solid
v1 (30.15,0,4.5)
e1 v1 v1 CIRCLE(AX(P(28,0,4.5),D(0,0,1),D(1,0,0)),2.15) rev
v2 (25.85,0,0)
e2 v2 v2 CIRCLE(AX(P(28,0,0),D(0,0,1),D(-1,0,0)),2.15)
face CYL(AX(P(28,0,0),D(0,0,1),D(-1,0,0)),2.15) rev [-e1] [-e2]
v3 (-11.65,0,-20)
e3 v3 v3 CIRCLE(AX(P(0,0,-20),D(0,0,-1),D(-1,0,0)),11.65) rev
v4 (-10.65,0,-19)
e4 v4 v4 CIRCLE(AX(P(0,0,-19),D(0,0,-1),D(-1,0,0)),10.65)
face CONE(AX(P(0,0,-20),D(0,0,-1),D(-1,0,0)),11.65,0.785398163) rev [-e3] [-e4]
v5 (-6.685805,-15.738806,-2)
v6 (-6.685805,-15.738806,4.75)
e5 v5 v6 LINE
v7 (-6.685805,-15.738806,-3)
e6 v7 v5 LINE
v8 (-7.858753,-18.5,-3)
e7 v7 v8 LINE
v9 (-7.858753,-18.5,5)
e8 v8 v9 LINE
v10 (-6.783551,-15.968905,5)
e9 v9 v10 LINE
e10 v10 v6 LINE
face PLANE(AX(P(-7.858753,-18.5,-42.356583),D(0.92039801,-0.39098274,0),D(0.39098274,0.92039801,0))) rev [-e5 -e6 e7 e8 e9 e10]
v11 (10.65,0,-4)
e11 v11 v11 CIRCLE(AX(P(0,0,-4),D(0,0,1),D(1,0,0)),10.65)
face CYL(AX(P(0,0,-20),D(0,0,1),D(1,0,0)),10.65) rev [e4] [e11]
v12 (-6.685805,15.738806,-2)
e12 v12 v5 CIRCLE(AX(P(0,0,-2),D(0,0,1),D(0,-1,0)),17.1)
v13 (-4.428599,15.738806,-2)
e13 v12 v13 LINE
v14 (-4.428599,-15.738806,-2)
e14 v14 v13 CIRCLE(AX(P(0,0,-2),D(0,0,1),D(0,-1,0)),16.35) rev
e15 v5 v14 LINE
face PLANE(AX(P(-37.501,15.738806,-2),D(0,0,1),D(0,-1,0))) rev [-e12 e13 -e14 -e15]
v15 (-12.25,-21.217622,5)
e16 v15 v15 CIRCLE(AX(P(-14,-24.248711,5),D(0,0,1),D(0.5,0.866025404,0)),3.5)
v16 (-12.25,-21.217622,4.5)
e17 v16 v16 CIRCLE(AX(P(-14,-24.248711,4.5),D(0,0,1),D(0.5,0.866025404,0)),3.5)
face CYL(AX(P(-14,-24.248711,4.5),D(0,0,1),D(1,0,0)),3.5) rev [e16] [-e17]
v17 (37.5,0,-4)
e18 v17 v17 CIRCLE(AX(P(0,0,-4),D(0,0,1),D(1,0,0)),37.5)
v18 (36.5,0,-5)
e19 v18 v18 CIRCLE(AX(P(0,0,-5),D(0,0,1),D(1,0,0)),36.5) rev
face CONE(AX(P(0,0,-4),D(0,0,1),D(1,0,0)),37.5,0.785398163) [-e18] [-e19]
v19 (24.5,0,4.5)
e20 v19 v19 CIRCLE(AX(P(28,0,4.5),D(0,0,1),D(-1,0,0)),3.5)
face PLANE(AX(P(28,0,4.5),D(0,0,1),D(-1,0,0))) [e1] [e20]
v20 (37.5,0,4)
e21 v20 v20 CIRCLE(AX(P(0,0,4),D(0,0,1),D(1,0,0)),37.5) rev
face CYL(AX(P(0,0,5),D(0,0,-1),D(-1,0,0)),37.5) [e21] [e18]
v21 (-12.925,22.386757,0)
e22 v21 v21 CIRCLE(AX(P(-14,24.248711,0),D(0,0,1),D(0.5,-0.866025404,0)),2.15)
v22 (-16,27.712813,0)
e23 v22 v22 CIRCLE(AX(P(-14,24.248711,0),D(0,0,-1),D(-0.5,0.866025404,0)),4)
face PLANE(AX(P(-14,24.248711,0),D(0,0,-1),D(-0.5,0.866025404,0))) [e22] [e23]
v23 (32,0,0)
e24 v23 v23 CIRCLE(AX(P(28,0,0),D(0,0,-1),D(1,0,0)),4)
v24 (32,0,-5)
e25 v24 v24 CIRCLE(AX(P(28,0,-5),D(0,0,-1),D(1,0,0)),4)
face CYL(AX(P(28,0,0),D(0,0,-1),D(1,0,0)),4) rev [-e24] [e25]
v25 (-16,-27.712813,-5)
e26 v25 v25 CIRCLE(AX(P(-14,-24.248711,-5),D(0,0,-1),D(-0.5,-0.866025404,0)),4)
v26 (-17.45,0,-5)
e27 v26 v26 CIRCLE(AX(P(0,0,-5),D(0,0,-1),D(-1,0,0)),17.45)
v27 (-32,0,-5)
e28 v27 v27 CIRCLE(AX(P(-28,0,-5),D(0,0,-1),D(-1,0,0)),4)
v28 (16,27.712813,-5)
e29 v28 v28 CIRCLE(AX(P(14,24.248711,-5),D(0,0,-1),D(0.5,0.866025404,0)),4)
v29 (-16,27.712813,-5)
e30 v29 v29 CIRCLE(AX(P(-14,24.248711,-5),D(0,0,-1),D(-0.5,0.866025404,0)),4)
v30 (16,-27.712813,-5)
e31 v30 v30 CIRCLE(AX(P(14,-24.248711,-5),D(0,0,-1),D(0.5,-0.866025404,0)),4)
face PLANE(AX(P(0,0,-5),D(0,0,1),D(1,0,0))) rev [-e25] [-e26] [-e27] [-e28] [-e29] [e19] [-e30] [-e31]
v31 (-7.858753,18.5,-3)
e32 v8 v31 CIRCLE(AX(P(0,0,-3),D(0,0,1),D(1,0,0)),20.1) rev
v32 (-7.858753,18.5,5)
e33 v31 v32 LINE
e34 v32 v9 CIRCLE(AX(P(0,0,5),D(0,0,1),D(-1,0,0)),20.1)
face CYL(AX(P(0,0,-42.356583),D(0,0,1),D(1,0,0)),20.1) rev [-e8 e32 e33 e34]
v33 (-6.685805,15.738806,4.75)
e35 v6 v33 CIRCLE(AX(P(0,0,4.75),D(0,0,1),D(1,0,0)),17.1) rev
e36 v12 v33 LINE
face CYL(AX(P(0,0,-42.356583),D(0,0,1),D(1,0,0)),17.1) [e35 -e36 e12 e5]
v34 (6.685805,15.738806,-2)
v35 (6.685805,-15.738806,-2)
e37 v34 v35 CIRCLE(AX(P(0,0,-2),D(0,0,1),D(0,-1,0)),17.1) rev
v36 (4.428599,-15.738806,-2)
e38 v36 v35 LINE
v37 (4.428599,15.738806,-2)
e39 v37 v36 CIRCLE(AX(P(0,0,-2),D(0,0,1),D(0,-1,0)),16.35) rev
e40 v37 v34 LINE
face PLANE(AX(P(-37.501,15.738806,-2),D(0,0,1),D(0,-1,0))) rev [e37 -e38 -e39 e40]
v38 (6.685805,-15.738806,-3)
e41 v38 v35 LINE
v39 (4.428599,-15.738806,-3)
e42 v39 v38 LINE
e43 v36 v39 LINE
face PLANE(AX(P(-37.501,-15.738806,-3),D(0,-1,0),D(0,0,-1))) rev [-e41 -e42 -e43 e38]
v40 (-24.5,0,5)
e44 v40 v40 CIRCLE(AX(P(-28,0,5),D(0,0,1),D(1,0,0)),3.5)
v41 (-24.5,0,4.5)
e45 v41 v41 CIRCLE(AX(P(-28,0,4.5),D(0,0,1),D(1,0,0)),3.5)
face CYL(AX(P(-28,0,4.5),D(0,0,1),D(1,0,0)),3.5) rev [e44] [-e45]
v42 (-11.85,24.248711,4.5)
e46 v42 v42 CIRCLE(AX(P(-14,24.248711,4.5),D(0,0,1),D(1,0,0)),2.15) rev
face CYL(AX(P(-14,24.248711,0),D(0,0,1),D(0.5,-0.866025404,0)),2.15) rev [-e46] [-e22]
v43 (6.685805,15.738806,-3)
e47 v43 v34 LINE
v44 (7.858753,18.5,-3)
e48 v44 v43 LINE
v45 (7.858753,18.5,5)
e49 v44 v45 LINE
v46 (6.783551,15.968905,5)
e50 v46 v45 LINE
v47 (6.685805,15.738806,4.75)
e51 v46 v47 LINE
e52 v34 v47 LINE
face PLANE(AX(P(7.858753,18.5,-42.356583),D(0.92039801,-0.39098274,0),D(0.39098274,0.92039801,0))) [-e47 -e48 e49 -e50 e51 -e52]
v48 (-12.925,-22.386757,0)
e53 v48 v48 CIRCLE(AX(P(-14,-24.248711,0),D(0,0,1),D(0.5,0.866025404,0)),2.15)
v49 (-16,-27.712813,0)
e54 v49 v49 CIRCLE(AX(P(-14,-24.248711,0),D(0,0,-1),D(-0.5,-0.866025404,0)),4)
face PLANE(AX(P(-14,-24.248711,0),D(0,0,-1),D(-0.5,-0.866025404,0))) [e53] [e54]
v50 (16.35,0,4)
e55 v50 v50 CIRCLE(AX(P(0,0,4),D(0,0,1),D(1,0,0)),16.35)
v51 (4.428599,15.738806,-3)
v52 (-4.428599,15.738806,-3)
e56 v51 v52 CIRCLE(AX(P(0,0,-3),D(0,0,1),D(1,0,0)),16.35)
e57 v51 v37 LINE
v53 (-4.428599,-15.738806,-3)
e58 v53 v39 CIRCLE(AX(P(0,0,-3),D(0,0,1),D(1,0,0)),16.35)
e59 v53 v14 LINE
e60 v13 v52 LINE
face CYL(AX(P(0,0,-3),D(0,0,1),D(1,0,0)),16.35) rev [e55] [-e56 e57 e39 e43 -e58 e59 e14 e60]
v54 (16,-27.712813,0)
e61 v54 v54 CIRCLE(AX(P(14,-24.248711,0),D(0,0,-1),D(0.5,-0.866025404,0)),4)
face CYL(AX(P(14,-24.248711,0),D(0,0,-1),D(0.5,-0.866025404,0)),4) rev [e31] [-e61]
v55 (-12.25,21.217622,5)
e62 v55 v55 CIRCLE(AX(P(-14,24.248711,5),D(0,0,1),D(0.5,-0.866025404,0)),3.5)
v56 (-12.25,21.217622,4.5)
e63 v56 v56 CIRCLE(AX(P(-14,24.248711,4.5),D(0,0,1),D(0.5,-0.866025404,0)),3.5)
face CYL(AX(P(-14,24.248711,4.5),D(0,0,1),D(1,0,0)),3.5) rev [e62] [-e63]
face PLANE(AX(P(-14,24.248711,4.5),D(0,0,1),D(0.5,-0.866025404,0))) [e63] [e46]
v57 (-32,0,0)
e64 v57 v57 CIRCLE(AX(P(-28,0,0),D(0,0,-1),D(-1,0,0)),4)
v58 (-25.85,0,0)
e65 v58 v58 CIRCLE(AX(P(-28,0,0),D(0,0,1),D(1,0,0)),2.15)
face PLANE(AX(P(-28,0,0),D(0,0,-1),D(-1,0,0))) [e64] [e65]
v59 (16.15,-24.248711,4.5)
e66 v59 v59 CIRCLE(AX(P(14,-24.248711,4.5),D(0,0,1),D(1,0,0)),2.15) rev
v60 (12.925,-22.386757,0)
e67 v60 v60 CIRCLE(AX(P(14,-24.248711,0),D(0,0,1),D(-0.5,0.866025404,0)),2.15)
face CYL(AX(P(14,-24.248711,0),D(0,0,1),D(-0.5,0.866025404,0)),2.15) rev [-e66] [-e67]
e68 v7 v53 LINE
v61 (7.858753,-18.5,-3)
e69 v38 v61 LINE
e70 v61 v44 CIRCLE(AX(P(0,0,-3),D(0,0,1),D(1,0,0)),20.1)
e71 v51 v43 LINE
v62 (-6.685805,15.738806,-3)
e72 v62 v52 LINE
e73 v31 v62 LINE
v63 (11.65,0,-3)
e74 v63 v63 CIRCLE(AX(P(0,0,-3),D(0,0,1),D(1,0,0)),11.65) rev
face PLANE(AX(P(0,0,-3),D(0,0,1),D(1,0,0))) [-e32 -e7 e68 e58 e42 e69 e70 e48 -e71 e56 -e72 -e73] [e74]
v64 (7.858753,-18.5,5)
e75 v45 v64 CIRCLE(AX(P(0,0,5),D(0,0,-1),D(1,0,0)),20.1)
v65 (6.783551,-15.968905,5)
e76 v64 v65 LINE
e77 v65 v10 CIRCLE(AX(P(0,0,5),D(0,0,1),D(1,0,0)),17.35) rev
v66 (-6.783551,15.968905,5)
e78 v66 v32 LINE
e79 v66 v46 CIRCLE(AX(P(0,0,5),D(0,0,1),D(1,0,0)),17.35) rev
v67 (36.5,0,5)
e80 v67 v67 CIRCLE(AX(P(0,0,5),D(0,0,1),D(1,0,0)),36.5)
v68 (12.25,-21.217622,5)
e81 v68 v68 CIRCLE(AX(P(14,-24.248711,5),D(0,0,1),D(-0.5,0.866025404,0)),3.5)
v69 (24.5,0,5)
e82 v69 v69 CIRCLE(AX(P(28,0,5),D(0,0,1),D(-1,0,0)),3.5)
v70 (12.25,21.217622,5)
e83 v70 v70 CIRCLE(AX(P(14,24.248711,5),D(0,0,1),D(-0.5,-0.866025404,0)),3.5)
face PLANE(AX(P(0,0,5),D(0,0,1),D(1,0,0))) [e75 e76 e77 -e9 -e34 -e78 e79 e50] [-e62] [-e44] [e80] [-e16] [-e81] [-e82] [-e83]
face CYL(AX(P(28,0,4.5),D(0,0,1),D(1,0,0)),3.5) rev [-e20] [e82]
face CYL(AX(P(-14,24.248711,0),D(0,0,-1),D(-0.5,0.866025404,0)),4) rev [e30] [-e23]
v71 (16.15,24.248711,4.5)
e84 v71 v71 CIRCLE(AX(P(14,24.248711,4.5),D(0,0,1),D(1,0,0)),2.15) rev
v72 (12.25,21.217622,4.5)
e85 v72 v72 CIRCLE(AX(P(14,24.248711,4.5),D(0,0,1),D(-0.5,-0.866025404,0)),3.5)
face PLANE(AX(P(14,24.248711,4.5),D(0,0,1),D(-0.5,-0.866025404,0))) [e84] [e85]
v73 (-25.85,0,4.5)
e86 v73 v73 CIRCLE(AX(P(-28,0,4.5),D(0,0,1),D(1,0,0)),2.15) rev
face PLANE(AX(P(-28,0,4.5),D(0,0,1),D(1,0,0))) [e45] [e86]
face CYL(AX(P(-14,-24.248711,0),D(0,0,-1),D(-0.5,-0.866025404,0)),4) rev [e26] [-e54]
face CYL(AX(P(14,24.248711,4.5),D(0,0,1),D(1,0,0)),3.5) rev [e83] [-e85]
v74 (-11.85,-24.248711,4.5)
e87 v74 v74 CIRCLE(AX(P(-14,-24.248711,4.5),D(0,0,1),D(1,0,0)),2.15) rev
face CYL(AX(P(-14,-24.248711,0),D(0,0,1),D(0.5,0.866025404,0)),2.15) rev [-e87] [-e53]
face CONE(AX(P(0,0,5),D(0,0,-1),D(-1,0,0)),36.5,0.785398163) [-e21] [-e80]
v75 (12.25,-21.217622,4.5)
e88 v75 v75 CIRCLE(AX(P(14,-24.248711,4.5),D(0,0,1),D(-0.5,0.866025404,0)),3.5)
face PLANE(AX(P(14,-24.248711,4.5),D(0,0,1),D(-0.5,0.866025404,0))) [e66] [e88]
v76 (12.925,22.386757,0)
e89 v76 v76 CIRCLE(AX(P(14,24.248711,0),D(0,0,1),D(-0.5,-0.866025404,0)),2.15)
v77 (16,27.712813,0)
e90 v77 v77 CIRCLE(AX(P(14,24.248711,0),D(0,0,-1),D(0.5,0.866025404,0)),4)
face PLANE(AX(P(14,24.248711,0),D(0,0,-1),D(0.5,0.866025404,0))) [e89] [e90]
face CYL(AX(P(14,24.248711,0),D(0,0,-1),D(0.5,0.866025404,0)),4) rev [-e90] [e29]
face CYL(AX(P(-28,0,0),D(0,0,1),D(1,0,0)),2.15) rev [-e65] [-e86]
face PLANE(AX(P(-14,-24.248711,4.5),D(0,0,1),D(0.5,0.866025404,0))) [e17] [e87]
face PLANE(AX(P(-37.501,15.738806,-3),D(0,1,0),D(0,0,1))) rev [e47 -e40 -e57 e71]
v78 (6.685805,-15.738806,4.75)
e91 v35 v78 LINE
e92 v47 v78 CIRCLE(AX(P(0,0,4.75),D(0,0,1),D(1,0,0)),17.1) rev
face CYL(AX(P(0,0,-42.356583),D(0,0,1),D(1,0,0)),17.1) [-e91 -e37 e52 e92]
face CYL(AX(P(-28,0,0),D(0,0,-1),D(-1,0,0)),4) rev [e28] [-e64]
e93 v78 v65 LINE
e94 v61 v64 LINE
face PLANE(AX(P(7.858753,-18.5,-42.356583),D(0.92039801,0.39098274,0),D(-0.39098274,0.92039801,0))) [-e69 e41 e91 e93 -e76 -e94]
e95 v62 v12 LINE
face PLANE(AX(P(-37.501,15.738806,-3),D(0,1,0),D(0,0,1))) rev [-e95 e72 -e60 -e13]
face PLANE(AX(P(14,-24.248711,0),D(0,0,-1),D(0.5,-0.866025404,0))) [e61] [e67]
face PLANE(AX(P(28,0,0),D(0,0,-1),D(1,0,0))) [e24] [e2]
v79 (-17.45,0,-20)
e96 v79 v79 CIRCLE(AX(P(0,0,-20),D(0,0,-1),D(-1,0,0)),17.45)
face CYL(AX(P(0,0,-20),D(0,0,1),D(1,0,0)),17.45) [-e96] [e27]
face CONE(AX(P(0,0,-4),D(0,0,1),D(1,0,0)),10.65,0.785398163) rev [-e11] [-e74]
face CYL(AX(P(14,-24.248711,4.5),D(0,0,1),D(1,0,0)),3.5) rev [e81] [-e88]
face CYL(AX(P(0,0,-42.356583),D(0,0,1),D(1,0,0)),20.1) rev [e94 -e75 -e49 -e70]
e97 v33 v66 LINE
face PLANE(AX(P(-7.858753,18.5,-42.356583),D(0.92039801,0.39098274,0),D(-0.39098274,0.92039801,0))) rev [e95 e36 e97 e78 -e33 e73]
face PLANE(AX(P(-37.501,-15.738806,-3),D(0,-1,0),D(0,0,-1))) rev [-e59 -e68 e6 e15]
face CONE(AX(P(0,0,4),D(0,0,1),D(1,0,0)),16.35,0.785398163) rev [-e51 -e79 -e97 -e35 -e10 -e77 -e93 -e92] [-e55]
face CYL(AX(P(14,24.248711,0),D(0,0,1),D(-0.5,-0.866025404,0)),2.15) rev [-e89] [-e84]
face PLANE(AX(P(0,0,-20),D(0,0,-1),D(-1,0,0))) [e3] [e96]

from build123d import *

# Parameters (mm, degrees)
SKETCH1_R                             = 37.5
BASE_PLATE_DEPTH                      = 5
SKETCH2_R                             = 6
PIN_DEPTH                             = 30
SKETCH11_R                            = 4
SCREWINSERTS_DEPTH                    = 5
INSERTSCIRPATTERN3_COUNT              = 6
SKETCH10_R                            = 2.15
SCREW_HOLES_DEPTH                     = 35
SCREWHOLEPATTERN1_OUTLINE_R           = 2.15
SCREWHOLEPATTERN1_DEPTH               = 5
SKETCH9_R                             = 3.5
PINHOLES_DEPTH                        = 0.5
PINHOLECIRPATTERN2_COUNT              = 6
SKETCH3_R                             = 17.45
OUTPUT_SHAFT_DEPTH                    = 15
SKETCH5_R                             = 16.35
BEARINGHOLE_DEPTH                     = 8
SKETCH6_R                             = 10.65
INPUTSHAFT_HOLE_DEPTH                 = 66.24185773
COMPLIANCE_CUT_DEPTH                  = 8
CHAMFER_2_SIZE                        = 1
WALL_COMPLIANCE_CIT_REACH             = 65.541
SKETCH13_W                            = 1
SKETCH13_H                            = 31.47761194
WALL_COMPLIANCE_CIT_DIRECTION_2_REACH = 65.541


# Read off the part's stored shape, not the designer's step: ScrewHolePattern1
with BuildPart() as part:
    # Sketch1 → Base Plate (new, symmetric)
    with BuildSketch(Plane.XY):
        Circle(SKETCH1_R)
    extrude(amount=BASE_PLATE_DEPTH, both=True)

    # Sketch11 → ScrewInserts (cut)
    with BuildSketch(Plane(origin=(0, 0, -5), x_dir=(-1, 0, 0), z_dir=(0, 0, -1))):
        with Locations((28, 0)):
            Circle(SKETCH11_R)
    screwinserts = extrude(amount=-SCREWINSERTS_DEPTH, mode=Mode.SUBTRACT)

    # InsertsCirPattern3: ScrewInserts ×6 about axis
    insertscirpattern3_axis = Axis((0, 0, 0), (0, 0, 1))
    for i in range(1, INSERTSCIRPATTERN3_COUNT):
        add(screwinserts.rotate(insertscirpattern3_axis, i * 360 / INSERTSCIRPATTERN3_COUNT), mode=Mode.SUBTRACT)


with BuildPart() as body_2:
    # Sketch2 → Pin (new body)
    with BuildSketch(Plane.XY.offset(5)):
        with Locations((-28, 0)):
            Circle(SKETCH2_R)
    extrude(amount=PIN_DEPTH)


with BuildPart() as screw_holes_tool:
    # Sketch10 → Screw Holes (new body)
    with BuildSketch(Plane.XY.offset(35)):
        with Locations((-28, 0)):
            Circle(SKETCH10_R)
    extrude(amount=-SCREW_HOLES_DEPTH)


with BuildPart() as part_1:
    add(part.part)

    # Screw Holes: cut by screw_holes_tool
    add(screw_holes_tool.part, mode=Mode.SUBTRACT)

    # ScrewHolePattern1 outline → ScrewHolePattern1 (cut)
    with BuildSketch(Plane.XY):
        with Locations((-14, 24.248711306)):
            Circle(SCREWHOLEPATTERN1_OUTLINE_R)
        with Locations((14, 24.248711306)):
            Circle(SCREWHOLEPATTERN1_OUTLINE_R)
        with Locations((28, 0)):
            Circle(SCREWHOLEPATTERN1_OUTLINE_R)
        with Locations((14, -24.248711306)):
            Circle(SCREWHOLEPATTERN1_OUTLINE_R)
        with Locations((-14, -24.248711306)):
            Circle(SCREWHOLEPATTERN1_OUTLINE_R)
    extrude(amount=SCREWHOLEPATTERN1_DEPTH, mode=Mode.SUBTRACT)

    # Sketch9 → PinHoles (cut)
    with BuildSketch(Plane.XY.offset(5)):
        with Locations((-28, 0)):
            Circle(SKETCH9_R)
    pinholes = extrude(amount=-PINHOLES_DEPTH, mode=Mode.SUBTRACT)

    # PinHoleCirPattern2: PinHoles ×6 about axis
    pinholecirpattern2_axis = Axis((0, 0, 0), (0, 0, 1))
    for i in range(1, PINHOLECIRPATTERN2_COUNT):
        add(pinholes.rotate(pinholecirpattern2_axis, i * 360 / PINHOLECIRPATTERN2_COUNT), mode=Mode.SUBTRACT)

    # Sketch3 → Output Shaft (add)
    with BuildSketch(Plane(origin=(0, 0, -5), x_dir=(-1, 0, 0), z_dir=(0, 0, -1))):
        Circle(SKETCH3_R)
    extrude(amount=OUTPUT_SHAFT_DEPTH)

    # Sketch5 → BearingHole (cut)
    with BuildSketch(Plane.XY.offset(5)):
        Circle(SKETCH5_R)
    extrude(amount=-BEARINGHOLE_DEPTH, mode=Mode.SUBTRACT)

    # Sketch6 → InputShaft Hole (cut, through all)
    with BuildSketch(Plane.XY.offset(-3)):
        Circle(SKETCH6_R)
    extrude(amount=-INPUTSHAFT_HOLE_DEPTH, mode=Mode.SUBTRACT)

    # Sketch12 → Compliance Cut (cut)
    with BuildSketch(Plane.XY.offset(5)):
        with BuildLine():
            Line((-7.858753082, 18.5), (-6.685804861, 15.73880597))
            ThreePointArc((-6.685804861, 15.73880597), (-17.1, 0), (-6.685804861, -15.73880597))
            Line((-6.685804861, -15.73880597), (-7.858753082, -18.5))
            ThreePointArc((-7.858753082, -18.5), (-20.1, 0), (-7.858753082, 18.5))
        make_face()
    compliance_cut = extrude(amount=-COMPLIANCE_CUT_DEPTH, mode=Mode.SUBTRACT)

    # Mirror1: Compliance Cut across plane
    add(compliance_cut.mirror(Plane(origin=(0, 0, 0), x_dir=(0, 0, 1), z_dir=(1, 0, 0))), mode=Mode.SUBTRACT)

    # Chamfer 2
    # the kernel refuses this chamfer: 1 mm, written as the material it takes off along each edge
    with BuildSketch(Plane(origin=(0, 0, 5), x_dir=(1, 0, 0), z_dir=(0, -1, 0))) as chamfer_2_piece_1:
        Polygon((37.5, -CHAMFER_2_SIZE), (37.5 - CHAMFER_2_SIZE, 0), (37.5, 0), align=None)
    revolve(axis=Axis((0, 0, 5), (0, 0, 1)), mode=Mode.SUBTRACT)
    with BuildSketch(Plane(origin=(0, 0, -5), x_dir=(1, 0, 0), z_dir=(0, -1, 0))) as chamfer_2_piece_2:
        Polygon((37.5, CHAMFER_2_SIZE), (37.5 - CHAMFER_2_SIZE, 0), (37.5, 0), align=None)
    revolve(axis=Axis((0, 0, -5), (0, 0, 1)), mode=Mode.SUBTRACT)
    with BuildSketch(Plane(origin=(0, 0, -20), x_dir=(1, 0, 0), z_dir=(0, -1, 0))) as chamfer_2_piece_3:
        Polygon((10.65 + CHAMFER_2_SIZE, 0), (10.65, CHAMFER_2_SIZE), (10.65, 0), align=None)
    revolve(axis=Axis((0, 0, -20), (0, 0, 1)), mode=Mode.SUBTRACT)
    with BuildSketch(Plane(origin=(0, 0, -3), x_dir=(1, 0, 0), z_dir=(0, -1, 0))) as chamfer_2_piece_4:
        Polygon((10.65 + CHAMFER_2_SIZE, 0), (10.65, -CHAMFER_2_SIZE), (10.65, 0), align=None)
    revolve(axis=Axis((0, 0, -3), (0, 0, 1)), mode=Mode.SUBTRACT)
    with BuildSketch(Plane(origin=(0, 0, 5), x_dir=(1, 0, 0), z_dir=(0, -1, 0))) as chamfer_2_piece_5:
        Polygon((16.35 + CHAMFER_2_SIZE, 0), (16.35, -CHAMFER_2_SIZE), (16.35, 0), align=None)
    revolve(axis=Axis((0, 0, 5), (0, 0, 1)), mode=Mode.SUBTRACT)

    # Sketch13 → Wall Compliance Cit (cut, up to next)
    with BuildSketch(Plane(origin=(0, 0, 0), x_dir=(0, 0, -1), z_dir=(1, 0, 0)), mode=Mode.PRIVATE) as wall_compliance_cit_sk1:
        with Locations((2.5, 0)):
            Rectangle(SKETCH13_W, SKETCH13_H)
    wall_compliance_cit_tool1 = extrude(wall_compliance_cit_sk1.sketch, amount=-WALL_COMPLIANCE_CIT_REACH, mode=Mode.PRIVATE) & part_1.part
    add(wall_compliance_cit_tool1.solids().sort_by_distance((0, 0, -2.5))[0], mode=Mode.SUBTRACT)

    # Sketch13 → Wall Compliance Cit direction 2 (cut, up to next)
    with BuildSketch(Plane(origin=(0, 0, 0), x_dir=(0, 0, -1), z_dir=(1, 0, 0)), mode=Mode.PRIVATE) as wall_compliance_cit_direction_2_sk1:
        with Locations((2.5, 0)):
            Rectangle(SKETCH13_W, SKETCH13_H)
    wall_compliance_cit_direction_2_tool1 = extrude(wall_compliance_cit_direction_2_sk1.sketch, amount=WALL_COMPLIANCE_CIT_DIRECTION_2_REACH, mode=Mode.PRIVATE) & part_1.part
    add(wall_compliance_cit_direction_2_tool1.solids().sort_by_distance((0, 0, -2.5))[0], mode=Mode.SUBTRACT)


with BuildPart() as body_2_1:
    add(body_2.part)

    # Screw Holes: cut by screw_holes_tool
    add(screw_holes_tool.part, mode=Mode.SUBTRACT)


solid = part_1.part
